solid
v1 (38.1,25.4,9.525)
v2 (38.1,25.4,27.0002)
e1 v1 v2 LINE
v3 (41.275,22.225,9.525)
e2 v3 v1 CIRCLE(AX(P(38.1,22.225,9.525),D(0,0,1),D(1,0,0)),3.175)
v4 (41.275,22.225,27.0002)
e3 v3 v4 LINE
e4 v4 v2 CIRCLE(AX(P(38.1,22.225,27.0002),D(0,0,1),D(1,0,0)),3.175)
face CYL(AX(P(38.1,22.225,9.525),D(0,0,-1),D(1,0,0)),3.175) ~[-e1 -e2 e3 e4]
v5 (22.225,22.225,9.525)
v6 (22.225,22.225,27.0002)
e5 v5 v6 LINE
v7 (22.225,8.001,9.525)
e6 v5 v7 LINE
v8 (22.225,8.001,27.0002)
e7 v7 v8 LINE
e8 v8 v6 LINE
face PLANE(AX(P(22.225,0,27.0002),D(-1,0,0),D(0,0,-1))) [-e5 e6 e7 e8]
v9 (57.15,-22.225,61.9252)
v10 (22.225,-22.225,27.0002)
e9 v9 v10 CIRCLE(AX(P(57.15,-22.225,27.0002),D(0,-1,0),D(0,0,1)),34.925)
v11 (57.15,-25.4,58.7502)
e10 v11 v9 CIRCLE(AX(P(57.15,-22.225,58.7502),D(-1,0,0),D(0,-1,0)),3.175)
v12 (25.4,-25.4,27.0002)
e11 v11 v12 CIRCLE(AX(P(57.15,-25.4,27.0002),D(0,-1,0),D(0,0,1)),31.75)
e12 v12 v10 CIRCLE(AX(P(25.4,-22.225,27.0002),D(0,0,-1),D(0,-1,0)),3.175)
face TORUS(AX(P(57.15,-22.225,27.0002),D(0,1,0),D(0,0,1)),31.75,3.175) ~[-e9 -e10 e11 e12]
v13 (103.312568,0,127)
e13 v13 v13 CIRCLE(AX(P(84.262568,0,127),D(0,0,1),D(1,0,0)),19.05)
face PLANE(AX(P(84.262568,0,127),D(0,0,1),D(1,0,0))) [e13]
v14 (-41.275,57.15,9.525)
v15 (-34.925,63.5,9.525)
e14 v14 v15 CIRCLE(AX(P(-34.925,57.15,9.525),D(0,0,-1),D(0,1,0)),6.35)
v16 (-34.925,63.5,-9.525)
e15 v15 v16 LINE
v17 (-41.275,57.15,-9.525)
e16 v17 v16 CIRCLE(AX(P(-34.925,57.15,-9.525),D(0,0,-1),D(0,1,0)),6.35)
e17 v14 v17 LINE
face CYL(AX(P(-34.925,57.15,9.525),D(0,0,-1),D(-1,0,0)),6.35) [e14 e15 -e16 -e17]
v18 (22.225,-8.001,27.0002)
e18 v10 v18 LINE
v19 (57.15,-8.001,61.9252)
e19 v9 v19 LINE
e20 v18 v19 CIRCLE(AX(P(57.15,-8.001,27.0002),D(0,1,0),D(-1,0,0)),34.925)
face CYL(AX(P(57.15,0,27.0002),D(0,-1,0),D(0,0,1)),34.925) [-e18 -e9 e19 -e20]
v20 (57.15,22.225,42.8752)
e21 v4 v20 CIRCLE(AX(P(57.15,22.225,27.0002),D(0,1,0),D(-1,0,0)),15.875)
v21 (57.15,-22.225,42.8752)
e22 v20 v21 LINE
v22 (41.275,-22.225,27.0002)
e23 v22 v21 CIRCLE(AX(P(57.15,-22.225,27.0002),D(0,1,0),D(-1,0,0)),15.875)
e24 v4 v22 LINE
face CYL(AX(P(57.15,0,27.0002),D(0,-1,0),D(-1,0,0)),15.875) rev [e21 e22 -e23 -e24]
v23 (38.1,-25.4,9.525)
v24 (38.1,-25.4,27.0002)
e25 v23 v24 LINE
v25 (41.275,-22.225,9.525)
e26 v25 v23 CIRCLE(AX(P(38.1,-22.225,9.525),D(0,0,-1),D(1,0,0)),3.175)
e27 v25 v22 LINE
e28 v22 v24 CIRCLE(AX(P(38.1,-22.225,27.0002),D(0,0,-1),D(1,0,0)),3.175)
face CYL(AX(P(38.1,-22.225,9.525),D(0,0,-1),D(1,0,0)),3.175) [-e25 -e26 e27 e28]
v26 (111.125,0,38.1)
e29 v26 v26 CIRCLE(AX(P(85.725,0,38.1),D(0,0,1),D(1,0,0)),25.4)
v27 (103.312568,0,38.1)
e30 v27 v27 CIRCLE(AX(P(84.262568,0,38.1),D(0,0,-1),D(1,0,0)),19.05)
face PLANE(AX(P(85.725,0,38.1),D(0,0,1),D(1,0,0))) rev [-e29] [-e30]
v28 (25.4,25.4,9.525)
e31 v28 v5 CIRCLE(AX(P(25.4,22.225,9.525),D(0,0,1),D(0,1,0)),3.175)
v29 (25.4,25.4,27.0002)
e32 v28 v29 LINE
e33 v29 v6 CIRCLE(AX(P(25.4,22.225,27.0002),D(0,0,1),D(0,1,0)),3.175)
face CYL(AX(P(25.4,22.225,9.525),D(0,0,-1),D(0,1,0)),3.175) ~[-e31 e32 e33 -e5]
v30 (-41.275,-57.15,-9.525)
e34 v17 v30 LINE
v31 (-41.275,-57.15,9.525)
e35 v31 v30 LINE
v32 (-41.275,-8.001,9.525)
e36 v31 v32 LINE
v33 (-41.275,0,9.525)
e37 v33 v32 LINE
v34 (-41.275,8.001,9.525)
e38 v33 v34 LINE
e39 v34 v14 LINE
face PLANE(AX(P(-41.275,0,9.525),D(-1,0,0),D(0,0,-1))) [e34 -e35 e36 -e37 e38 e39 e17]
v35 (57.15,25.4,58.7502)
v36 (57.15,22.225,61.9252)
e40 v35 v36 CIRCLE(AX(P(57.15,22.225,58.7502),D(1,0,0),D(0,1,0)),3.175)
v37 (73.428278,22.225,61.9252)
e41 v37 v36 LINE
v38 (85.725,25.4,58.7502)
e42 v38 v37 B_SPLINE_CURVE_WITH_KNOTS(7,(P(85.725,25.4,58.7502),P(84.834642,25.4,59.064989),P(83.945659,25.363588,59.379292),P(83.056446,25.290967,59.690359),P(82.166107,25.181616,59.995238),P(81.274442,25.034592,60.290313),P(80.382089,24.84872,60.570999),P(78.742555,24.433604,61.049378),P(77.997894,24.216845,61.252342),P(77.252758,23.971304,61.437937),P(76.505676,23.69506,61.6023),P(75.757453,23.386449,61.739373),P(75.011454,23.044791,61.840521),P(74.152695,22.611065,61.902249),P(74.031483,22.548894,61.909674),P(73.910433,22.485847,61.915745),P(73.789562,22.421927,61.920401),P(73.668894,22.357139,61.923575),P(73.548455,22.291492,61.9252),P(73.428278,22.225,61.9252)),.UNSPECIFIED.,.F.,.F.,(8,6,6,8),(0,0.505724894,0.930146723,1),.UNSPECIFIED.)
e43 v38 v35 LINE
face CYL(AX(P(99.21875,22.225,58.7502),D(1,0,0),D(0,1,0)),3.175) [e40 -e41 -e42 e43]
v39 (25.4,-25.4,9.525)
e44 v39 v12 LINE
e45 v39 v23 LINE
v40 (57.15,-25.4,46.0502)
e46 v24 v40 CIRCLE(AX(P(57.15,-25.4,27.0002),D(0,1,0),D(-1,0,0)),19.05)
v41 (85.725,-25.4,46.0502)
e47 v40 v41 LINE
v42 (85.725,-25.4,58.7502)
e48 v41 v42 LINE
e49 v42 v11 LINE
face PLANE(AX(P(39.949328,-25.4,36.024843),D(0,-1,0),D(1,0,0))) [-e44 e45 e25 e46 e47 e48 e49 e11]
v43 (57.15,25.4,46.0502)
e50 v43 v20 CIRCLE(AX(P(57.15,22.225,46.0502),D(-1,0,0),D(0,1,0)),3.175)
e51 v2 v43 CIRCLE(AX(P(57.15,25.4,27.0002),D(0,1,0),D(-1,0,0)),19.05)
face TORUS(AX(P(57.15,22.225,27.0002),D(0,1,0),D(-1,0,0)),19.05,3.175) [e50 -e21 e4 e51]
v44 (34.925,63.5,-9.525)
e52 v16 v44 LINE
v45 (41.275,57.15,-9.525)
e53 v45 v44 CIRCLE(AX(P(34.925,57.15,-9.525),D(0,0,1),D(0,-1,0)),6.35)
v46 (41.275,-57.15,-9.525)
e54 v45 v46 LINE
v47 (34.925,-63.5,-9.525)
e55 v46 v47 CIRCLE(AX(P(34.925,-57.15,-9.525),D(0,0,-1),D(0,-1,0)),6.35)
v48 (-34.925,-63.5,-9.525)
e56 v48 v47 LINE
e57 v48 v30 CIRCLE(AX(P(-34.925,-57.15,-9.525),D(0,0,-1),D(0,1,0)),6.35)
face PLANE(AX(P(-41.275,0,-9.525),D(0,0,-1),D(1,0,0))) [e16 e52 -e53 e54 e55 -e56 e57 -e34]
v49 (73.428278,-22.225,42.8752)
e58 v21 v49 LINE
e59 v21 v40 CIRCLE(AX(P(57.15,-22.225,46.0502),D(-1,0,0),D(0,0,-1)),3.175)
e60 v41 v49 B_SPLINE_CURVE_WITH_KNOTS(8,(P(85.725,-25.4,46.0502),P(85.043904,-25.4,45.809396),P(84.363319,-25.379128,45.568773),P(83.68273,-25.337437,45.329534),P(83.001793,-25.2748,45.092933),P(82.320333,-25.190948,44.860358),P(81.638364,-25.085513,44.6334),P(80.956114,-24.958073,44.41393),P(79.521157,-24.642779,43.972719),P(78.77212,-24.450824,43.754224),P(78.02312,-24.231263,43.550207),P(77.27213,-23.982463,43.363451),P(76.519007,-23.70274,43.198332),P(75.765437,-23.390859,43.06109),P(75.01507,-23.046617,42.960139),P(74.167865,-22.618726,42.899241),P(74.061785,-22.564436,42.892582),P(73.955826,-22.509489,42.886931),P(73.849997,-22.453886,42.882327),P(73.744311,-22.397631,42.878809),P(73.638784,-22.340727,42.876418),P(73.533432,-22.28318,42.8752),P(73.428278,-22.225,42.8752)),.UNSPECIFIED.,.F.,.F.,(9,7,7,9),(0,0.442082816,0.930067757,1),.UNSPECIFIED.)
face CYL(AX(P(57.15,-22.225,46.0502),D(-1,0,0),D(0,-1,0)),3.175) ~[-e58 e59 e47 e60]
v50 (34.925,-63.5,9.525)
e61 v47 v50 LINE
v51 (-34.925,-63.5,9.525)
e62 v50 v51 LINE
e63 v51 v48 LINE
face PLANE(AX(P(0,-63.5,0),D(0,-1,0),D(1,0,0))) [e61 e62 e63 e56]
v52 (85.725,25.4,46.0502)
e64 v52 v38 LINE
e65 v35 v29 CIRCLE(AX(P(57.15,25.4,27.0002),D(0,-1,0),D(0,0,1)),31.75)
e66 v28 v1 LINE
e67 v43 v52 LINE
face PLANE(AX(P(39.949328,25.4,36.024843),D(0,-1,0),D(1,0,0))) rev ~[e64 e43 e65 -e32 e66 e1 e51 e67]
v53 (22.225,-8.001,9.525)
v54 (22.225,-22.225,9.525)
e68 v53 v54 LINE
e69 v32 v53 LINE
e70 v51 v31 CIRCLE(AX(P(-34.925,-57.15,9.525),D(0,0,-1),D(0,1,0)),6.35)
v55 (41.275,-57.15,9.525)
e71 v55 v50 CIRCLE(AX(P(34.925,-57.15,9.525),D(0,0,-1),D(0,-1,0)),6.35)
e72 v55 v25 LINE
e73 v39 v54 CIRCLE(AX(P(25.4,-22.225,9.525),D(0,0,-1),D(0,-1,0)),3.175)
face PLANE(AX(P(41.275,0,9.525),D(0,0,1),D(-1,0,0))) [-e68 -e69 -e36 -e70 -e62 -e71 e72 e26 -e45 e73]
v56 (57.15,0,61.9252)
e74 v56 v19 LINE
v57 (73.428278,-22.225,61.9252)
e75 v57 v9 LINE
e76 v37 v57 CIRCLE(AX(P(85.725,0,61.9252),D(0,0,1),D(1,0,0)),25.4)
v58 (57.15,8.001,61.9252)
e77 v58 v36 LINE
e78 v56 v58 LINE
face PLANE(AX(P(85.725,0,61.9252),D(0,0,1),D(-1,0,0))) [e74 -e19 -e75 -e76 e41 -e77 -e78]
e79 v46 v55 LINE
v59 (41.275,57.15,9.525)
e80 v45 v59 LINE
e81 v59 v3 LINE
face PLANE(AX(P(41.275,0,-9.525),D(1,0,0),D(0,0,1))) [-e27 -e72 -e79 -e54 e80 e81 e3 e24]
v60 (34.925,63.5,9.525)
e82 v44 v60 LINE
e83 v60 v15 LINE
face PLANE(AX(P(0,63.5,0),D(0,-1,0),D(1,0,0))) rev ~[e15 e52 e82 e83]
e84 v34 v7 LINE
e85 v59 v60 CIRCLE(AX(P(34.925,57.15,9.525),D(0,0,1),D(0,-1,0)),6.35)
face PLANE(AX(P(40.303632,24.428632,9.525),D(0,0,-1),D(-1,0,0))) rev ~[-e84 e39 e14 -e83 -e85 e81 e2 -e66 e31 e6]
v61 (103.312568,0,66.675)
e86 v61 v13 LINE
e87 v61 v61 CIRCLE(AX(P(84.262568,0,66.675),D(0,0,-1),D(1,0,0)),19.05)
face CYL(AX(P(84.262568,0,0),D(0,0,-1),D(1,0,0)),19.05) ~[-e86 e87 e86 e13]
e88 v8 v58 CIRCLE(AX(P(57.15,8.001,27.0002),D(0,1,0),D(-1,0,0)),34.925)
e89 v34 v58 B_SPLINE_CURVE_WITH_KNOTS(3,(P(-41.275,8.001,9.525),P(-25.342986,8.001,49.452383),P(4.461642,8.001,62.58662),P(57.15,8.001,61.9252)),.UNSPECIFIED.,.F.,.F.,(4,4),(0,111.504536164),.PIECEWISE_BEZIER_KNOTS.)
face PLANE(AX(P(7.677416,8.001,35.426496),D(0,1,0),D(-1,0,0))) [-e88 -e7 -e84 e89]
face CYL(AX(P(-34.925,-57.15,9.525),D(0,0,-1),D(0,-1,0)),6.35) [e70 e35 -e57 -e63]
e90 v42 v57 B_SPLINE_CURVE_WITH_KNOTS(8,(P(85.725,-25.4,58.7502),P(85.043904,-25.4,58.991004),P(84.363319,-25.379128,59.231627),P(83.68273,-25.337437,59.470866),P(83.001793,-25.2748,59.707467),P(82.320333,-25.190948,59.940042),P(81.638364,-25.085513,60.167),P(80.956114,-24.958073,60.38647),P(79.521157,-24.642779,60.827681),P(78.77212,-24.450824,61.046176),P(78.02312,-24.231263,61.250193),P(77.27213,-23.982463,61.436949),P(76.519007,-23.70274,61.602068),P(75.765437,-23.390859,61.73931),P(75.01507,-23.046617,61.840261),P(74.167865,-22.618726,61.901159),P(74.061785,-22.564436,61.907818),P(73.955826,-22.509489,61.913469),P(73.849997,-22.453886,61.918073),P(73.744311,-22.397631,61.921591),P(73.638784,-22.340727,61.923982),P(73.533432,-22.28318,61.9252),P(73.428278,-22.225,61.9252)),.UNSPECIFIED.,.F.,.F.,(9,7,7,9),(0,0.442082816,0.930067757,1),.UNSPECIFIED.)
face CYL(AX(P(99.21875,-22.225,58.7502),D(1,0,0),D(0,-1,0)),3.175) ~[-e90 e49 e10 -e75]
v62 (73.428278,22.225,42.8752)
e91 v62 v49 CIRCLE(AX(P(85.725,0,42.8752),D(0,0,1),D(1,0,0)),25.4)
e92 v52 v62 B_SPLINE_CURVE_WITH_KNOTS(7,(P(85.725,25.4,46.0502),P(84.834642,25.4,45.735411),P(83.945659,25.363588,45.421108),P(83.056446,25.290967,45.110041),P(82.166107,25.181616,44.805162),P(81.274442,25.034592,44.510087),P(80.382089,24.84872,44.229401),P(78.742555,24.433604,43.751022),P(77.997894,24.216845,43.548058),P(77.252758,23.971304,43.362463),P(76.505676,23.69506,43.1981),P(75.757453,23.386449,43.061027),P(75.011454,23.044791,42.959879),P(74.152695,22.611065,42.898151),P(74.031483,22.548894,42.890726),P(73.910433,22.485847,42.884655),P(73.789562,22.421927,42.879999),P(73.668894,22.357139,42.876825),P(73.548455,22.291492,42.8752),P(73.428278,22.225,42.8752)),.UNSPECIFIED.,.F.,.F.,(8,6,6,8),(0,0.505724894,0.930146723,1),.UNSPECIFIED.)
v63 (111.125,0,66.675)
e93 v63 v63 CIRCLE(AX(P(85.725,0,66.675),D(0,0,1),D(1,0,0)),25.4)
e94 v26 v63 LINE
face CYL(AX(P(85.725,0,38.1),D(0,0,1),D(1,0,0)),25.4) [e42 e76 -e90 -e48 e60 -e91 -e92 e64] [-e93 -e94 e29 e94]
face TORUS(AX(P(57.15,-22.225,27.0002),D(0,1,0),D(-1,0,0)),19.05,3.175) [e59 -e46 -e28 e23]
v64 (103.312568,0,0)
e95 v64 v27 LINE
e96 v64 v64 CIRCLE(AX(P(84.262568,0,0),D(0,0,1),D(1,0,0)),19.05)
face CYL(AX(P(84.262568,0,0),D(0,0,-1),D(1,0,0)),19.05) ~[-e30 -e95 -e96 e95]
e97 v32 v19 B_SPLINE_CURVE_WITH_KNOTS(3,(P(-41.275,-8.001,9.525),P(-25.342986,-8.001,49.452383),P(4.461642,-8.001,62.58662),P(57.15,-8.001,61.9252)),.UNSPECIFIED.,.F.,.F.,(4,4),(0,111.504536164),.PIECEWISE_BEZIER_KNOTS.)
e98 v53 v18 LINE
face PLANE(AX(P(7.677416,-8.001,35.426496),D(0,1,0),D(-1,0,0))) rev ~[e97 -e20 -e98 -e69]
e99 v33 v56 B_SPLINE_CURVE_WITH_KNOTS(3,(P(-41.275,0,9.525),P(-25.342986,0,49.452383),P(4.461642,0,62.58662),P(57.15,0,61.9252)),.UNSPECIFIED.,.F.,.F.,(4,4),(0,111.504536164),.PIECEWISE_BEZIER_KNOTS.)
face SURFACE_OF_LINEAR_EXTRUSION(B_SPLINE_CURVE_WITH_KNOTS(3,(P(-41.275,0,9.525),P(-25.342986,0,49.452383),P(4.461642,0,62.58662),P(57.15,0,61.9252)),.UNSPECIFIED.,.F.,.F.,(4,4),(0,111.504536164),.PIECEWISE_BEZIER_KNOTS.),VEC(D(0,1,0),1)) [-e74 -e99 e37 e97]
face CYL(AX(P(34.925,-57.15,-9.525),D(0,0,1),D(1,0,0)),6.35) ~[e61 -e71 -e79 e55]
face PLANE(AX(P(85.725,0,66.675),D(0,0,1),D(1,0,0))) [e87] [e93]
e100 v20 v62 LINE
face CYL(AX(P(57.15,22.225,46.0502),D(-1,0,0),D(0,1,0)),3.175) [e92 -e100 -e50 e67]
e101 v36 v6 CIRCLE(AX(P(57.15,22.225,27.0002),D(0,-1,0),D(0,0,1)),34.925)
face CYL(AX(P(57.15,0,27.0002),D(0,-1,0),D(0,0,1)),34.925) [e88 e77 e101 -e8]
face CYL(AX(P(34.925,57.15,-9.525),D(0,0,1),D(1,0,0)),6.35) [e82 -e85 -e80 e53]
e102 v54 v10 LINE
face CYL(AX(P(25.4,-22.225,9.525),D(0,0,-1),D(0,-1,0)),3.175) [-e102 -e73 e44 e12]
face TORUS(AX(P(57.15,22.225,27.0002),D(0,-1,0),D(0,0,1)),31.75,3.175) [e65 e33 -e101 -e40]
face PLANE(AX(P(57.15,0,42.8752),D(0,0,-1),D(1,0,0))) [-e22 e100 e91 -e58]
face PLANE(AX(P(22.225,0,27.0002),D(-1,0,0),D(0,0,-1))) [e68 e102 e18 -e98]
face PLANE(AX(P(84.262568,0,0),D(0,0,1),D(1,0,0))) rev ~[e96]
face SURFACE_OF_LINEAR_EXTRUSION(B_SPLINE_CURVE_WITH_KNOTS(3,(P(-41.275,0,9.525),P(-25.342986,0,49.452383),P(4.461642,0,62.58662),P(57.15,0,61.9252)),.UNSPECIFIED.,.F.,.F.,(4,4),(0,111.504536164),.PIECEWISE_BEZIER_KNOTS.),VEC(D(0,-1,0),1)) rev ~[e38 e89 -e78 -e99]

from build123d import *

# Parameters (mm, degrees)
F2_DEPTH     = 63.5
F0_W         = 25.4
F0_H         = 19.05
F3_DEPTH     = 25.4
F4_DEPTH     = 8.001
F6_R         = 6.35
F7_T1_DEPTH  = 17.4752
F7_T4_ANGLE  = 90
F7_T8_DEPTH  = 42.06875
F7_S9_R      = 25.4
F7_T10_DEPTH = 23
F7_T12_ANGLE = 90
F7_T14_ANGLE = 90
F7_T18_DEPTH = 42.06875
F7_S19_R     = 25.4
F7_T20_DEPTH = 23
F7_T22_ANGLE = 90
F7_T26_DEPTH = 42.06875
F7_S27_R     = 25.4
F7_T28_DEPTH = 23
F7_T32_DEPTH = 42.06875
F7_S33_R     = 25.4
F7_T34_DEPTH = 23
F8_R         = 19.05
F9_DEPTH     = 127


# Not quite as in the source:
# - a fillet or chamfer that OpenCascade refuses, or shapes differently, is made with other operations: its cross-section is extruded or revolved along the edge and cut away or added


with BuildPart() as f2:
    # F0 (on Front) → F2 (new body, symmetric)
    with BuildSketch(Plane.XZ):
        Polygon((22.225, 9.525), (-41.275, 9.525), (-41.275, -9.525), (41.275, -9.525), (41.275, 9.525), align=None)
    extrude(amount=F2_DEPTH, both=True)

    # F0 (on Front) → F3 (join, symmetric)
    with BuildSketch(Plane.XZ):
        with BuildLine():
            Line((22.225, 27.0002), (22.225, 9.525))
            Line((22.225, 9.525), (41.275, 9.525))
            Line((41.275, 9.525), (41.275, 27.0002))
            ThreePointArc((41.275, 27.0002), (45.9246798487, 38.2255201513), (57.15, 42.8752))
            Line((57.15, 42.8752), (60.325, 42.8752))
            Line((60.325, 42.8752), (60.325, 61.9252))
            Line((60.325, 61.9252), (57.15, 61.9252))
            ThreePointArc((57.15, 61.9252), (32.4542956671, 51.6959043329), (22.225, 27.0002))
        make_face()
        with Locations((73.025, 52.4002)):
            Rectangle(F0_W, F0_H)
    extrude(amount=F3_DEPTH, both=True)

    # F0 (on Front) → F4 (join, symmetric)
    with BuildSketch(Plane.XZ):
        with BuildLine():
            add(Edge.make_bspline(
                [(-41.275, 9.525), (-25.3429859877, 49.4523830712), (4.4616423547, 62.58662045), (57.15, 61.9252)],
                knots=[0, 0, 0, 0, 111.5045361635, 111.5045361635, 111.5045361635, 111.5045361635], degree=3))
            Line((-41.275, 9.525), (22.225, 9.525))
            Line((22.225, 9.525), (22.225, 27.0002))
            ThreePointArc((22.225, 27.0002), (32.4542956671, 51.6959043329), (57.15, 61.9252))
        make_face()
    extrude(amount=F4_DEPTH, both=True)

    # F0 (on Front) → F5 (revolve)
    with BuildSketch(Plane.XZ):
        Polygon((85.725, 66.675), (85.725, 61.9252), (85.725, 42.8752), (85.725, 38.1), (111.125, 38.1), (111.125, 66.675), align=None)
    revolve(axis=Axis((85.725, 0, 52.3875), (0, 0, 1)))

    # F6
    f6_edges = [f2.edges().sort_by_distance(p)[0] for p in [
        (41.275, -63.5, 0),
        (-41.275, -63.5, 0),
        (41.275, 63.5, 0),
        (-41.275, 63.5, 0),
    ]]
    fillet(f6_edges, radius=F6_R)

    # F7: fillet of radius 3.175 on 12 edges, made by hand

    # F7_s2 → F7_t1 (cut)
    with BuildSketch(Plane.XY.offset(9.525)):
        with BuildLine():
            ThreePointArc((25.4, -25.4), (23.1549359697, -24.4700640303), (22.225, -22.225))
            Line((22.225, -22.225), (22.225, -25.4))
            Line((22.225, -25.4), (25.4, -25.4))
        make_face()
        with BuildLine():
            ThreePointArc((41.275, -22.225), (40.3450640303, -24.4700640303), (38.1, -25.4))
            Line((38.1, -25.4), (41.275, -25.4))
            Line((41.275, -25.4), (41.275, -22.225))
        make_face()
        with BuildLine():
            ThreePointArc((25.4, 25.4), (23.1549359697, 24.4700640303), (22.225, 22.225))
            Line((22.225, 22.225), (22.225, 25.4))
            Line((22.225, 25.4), (25.4, 25.4))
        make_face()
        with BuildLine():
            ThreePointArc((41.275, 22.225), (40.3450640303, 24.4700640303), (38.1, 25.4))
            Line((38.1, 25.4), (41.275, 25.4))
            Line((41.275, 25.4), (41.275, 22.225))
        make_face()
    extrude(amount=F7_T1_DEPTH, mode=Mode.SUBTRACT)

    # F7_s3 → F7_t4 (revolve, cut)
    with BuildSketch(Plane.YZ.offset(57.15)):
        with BuildLine():
            ThreePointArc((-25.4, 58.7502), (-24.4700640303, 60.9952640303), (-22.225, 61.9252))
            Line((-22.225, 61.9252), (-25.4, 61.9252))
            Line((-25.4, 61.9252), (-25.4, 58.7502))
        make_face()
    revolve(axis=Axis((57.15, -25.4, 27.0002), (0, -1, 0)), revolution_arc=F7_T4_ANGLE, mode=Mode.SUBTRACT)


with BuildPart() as f7_tool6:
    # F7_s7 → F7_t8 (new body)
    with BuildSketch(Plane.YZ.offset(99.21875)):
        with BuildLine():
            ThreePointArc((-25.4, 58.7502), (-24.4700640303, 60.9952640303), (-22.225, 61.9252))
            Line((-22.225, 61.9252), (-25.4, 61.9252))
            Line((-25.4, 61.9252), (-25.4, 58.7502))
        make_face()
    extrude(amount=-F7_T8_DEPTH)

    # F7_s9 → F7_t10 (cut, symmetric)
    with BuildSketch(Plane.XY.offset(60.3)):
        with Locations((85.725, 0)):
            Circle(F7_S9_R)
    extrude(amount=F7_T10_DEPTH, both=True, mode=Mode.SUBTRACT)


with BuildPart() as f2_1:
    add(f2.part)

    # F7_t5: cut F7_tool6
    add(f7_tool6.part, mode=Mode.SUBTRACT)

    # F7_s11 → F7_t12 (revolve, cut)
    with BuildSketch(Plane.XY.offset(27.0002)):
        with BuildLine():
            ThreePointArc((41.275, -22.225), (40.3450640303, -24.4700640303), (38.1, -25.4))
            Line((38.1, -25.4), (41.275, -25.4))
            Line((41.275, -25.4), (41.275, -22.225))
        make_face()
    revolve(axis=Axis((57.15, -25.4, 27.0002), (0, 1, 0)), revolution_arc=F7_T12_ANGLE, mode=Mode.SUBTRACT)

    # F7_s13 → F7_t14 (revolve, cut)
    with BuildSketch(Plane.YZ.offset(57.15)):
        with BuildLine():
            ThreePointArc((25.4, 58.7502), (24.4700640303, 60.9952640303), (22.225, 61.9252))
            Line((22.225, 61.9252), (25.4, 61.9252))
            Line((25.4, 61.9252), (25.4, 58.7502))
        make_face()
    revolve(axis=Axis((57.15, 25.4, 27.0002), (0, -1, 0)), revolution_arc=F7_T14_ANGLE, mode=Mode.SUBTRACT)


with BuildPart() as f7_tool16:
    # F7_s17 → F7_t18 (new body)
    with BuildSketch(Plane.YZ.offset(99.21875)):
        with BuildLine():
            ThreePointArc((25.4, 58.7502), (24.4700640303, 60.9952640303), (22.225, 61.9252))
            Line((22.225, 61.9252), (25.4, 61.9252))
            Line((25.4, 61.9252), (25.4, 58.7502))
        make_face()
    extrude(amount=-F7_T18_DEPTH)

    # F7_s19 → F7_t20 (cut, symmetric)
    with BuildSketch(Plane.XY.offset(60.3)):
        with Locations((85.725, 0)):
            Circle(F7_S19_R)
    extrude(amount=F7_T20_DEPTH, both=True, mode=Mode.SUBTRACT)


with BuildPart() as f2_2:
    add(f2_1.part)

    # F7_t15: cut F7_tool16
    add(f7_tool16.part, mode=Mode.SUBTRACT)

    # F7_s21 → F7_t22 (revolve, cut)
    with BuildSketch(Plane.XY.offset(27.0002)):
        with BuildLine():
            ThreePointArc((38.1, 25.4), (40.3450640303, 24.4700640303), (41.275, 22.225))
            Line((41.275, 22.225), (41.275, 25.4))
            Line((41.275, 25.4), (38.1, 25.4))
        make_face()
    revolve(axis=Axis((57.15, 25.4, 27.0002), (0, 1, 0)), revolution_arc=F7_T22_ANGLE, mode=Mode.SUBTRACT)


with BuildPart() as f7_tool24:
    # F7_s25 → F7_t26 (new body)
    with BuildSketch(Plane.YZ.offset(57.15)):
        with BuildLine():
            ThreePointArc((25.4, 46.0502), (24.4700640303, 43.8051359697), (22.225, 42.8752))
            Line((22.225, 42.8752), (25.4, 42.8752))
            Line((25.4, 42.8752), (25.4, 46.0502))
        make_face()
    extrude(amount=F7_T26_DEPTH)

    # F7_s27 → F7_t28 (cut, symmetric)
    with BuildSketch(Plane.XY.offset(44.5)):
        with Locations((85.725, 0)):
            Circle(F7_S27_R)
    extrude(amount=F7_T28_DEPTH, both=True, mode=Mode.SUBTRACT)


with BuildPart() as f2_3:
    add(f2_2.part)

    # F7_t23: cut F7_tool24
    add(f7_tool24.part, mode=Mode.SUBTRACT)


with BuildPart() as f7_tool30:
    # F7_s31 → F7_t32 (new body)
    with BuildSketch(Plane.YZ.offset(57.15)):
        with BuildLine():
            ThreePointArc((-25.4, 46.0502), (-24.4700640303, 43.8051359697), (-22.225, 42.8752))
            Line((-22.225, 42.8752), (-25.4, 42.8752))
            Line((-25.4, 42.8752), (-25.4, 46.0502))
        make_face()
    extrude(amount=F7_T32_DEPTH)

    # F7_s33 → F7_t34 (cut, symmetric)
    with BuildSketch(Plane.XY.offset(44.5)):
        with Locations((85.725, 0)):
            Circle(F7_S33_R)
    extrude(amount=F7_T34_DEPTH, both=True, mode=Mode.SUBTRACT)


with BuildPart() as f2_4:
    add(f2_3.part)

    # F7_t29: cut F7_tool30
    add(f7_tool30.part, mode=Mode.SUBTRACT)

    # F8 (on Top) → F9 (join)
    with BuildSketch(Plane.XY):
        with Locations((84.2625681776, 0)):
            Circle(F8_R)
    extrude(amount=F9_DEPTH)


solid = f2_4.part
